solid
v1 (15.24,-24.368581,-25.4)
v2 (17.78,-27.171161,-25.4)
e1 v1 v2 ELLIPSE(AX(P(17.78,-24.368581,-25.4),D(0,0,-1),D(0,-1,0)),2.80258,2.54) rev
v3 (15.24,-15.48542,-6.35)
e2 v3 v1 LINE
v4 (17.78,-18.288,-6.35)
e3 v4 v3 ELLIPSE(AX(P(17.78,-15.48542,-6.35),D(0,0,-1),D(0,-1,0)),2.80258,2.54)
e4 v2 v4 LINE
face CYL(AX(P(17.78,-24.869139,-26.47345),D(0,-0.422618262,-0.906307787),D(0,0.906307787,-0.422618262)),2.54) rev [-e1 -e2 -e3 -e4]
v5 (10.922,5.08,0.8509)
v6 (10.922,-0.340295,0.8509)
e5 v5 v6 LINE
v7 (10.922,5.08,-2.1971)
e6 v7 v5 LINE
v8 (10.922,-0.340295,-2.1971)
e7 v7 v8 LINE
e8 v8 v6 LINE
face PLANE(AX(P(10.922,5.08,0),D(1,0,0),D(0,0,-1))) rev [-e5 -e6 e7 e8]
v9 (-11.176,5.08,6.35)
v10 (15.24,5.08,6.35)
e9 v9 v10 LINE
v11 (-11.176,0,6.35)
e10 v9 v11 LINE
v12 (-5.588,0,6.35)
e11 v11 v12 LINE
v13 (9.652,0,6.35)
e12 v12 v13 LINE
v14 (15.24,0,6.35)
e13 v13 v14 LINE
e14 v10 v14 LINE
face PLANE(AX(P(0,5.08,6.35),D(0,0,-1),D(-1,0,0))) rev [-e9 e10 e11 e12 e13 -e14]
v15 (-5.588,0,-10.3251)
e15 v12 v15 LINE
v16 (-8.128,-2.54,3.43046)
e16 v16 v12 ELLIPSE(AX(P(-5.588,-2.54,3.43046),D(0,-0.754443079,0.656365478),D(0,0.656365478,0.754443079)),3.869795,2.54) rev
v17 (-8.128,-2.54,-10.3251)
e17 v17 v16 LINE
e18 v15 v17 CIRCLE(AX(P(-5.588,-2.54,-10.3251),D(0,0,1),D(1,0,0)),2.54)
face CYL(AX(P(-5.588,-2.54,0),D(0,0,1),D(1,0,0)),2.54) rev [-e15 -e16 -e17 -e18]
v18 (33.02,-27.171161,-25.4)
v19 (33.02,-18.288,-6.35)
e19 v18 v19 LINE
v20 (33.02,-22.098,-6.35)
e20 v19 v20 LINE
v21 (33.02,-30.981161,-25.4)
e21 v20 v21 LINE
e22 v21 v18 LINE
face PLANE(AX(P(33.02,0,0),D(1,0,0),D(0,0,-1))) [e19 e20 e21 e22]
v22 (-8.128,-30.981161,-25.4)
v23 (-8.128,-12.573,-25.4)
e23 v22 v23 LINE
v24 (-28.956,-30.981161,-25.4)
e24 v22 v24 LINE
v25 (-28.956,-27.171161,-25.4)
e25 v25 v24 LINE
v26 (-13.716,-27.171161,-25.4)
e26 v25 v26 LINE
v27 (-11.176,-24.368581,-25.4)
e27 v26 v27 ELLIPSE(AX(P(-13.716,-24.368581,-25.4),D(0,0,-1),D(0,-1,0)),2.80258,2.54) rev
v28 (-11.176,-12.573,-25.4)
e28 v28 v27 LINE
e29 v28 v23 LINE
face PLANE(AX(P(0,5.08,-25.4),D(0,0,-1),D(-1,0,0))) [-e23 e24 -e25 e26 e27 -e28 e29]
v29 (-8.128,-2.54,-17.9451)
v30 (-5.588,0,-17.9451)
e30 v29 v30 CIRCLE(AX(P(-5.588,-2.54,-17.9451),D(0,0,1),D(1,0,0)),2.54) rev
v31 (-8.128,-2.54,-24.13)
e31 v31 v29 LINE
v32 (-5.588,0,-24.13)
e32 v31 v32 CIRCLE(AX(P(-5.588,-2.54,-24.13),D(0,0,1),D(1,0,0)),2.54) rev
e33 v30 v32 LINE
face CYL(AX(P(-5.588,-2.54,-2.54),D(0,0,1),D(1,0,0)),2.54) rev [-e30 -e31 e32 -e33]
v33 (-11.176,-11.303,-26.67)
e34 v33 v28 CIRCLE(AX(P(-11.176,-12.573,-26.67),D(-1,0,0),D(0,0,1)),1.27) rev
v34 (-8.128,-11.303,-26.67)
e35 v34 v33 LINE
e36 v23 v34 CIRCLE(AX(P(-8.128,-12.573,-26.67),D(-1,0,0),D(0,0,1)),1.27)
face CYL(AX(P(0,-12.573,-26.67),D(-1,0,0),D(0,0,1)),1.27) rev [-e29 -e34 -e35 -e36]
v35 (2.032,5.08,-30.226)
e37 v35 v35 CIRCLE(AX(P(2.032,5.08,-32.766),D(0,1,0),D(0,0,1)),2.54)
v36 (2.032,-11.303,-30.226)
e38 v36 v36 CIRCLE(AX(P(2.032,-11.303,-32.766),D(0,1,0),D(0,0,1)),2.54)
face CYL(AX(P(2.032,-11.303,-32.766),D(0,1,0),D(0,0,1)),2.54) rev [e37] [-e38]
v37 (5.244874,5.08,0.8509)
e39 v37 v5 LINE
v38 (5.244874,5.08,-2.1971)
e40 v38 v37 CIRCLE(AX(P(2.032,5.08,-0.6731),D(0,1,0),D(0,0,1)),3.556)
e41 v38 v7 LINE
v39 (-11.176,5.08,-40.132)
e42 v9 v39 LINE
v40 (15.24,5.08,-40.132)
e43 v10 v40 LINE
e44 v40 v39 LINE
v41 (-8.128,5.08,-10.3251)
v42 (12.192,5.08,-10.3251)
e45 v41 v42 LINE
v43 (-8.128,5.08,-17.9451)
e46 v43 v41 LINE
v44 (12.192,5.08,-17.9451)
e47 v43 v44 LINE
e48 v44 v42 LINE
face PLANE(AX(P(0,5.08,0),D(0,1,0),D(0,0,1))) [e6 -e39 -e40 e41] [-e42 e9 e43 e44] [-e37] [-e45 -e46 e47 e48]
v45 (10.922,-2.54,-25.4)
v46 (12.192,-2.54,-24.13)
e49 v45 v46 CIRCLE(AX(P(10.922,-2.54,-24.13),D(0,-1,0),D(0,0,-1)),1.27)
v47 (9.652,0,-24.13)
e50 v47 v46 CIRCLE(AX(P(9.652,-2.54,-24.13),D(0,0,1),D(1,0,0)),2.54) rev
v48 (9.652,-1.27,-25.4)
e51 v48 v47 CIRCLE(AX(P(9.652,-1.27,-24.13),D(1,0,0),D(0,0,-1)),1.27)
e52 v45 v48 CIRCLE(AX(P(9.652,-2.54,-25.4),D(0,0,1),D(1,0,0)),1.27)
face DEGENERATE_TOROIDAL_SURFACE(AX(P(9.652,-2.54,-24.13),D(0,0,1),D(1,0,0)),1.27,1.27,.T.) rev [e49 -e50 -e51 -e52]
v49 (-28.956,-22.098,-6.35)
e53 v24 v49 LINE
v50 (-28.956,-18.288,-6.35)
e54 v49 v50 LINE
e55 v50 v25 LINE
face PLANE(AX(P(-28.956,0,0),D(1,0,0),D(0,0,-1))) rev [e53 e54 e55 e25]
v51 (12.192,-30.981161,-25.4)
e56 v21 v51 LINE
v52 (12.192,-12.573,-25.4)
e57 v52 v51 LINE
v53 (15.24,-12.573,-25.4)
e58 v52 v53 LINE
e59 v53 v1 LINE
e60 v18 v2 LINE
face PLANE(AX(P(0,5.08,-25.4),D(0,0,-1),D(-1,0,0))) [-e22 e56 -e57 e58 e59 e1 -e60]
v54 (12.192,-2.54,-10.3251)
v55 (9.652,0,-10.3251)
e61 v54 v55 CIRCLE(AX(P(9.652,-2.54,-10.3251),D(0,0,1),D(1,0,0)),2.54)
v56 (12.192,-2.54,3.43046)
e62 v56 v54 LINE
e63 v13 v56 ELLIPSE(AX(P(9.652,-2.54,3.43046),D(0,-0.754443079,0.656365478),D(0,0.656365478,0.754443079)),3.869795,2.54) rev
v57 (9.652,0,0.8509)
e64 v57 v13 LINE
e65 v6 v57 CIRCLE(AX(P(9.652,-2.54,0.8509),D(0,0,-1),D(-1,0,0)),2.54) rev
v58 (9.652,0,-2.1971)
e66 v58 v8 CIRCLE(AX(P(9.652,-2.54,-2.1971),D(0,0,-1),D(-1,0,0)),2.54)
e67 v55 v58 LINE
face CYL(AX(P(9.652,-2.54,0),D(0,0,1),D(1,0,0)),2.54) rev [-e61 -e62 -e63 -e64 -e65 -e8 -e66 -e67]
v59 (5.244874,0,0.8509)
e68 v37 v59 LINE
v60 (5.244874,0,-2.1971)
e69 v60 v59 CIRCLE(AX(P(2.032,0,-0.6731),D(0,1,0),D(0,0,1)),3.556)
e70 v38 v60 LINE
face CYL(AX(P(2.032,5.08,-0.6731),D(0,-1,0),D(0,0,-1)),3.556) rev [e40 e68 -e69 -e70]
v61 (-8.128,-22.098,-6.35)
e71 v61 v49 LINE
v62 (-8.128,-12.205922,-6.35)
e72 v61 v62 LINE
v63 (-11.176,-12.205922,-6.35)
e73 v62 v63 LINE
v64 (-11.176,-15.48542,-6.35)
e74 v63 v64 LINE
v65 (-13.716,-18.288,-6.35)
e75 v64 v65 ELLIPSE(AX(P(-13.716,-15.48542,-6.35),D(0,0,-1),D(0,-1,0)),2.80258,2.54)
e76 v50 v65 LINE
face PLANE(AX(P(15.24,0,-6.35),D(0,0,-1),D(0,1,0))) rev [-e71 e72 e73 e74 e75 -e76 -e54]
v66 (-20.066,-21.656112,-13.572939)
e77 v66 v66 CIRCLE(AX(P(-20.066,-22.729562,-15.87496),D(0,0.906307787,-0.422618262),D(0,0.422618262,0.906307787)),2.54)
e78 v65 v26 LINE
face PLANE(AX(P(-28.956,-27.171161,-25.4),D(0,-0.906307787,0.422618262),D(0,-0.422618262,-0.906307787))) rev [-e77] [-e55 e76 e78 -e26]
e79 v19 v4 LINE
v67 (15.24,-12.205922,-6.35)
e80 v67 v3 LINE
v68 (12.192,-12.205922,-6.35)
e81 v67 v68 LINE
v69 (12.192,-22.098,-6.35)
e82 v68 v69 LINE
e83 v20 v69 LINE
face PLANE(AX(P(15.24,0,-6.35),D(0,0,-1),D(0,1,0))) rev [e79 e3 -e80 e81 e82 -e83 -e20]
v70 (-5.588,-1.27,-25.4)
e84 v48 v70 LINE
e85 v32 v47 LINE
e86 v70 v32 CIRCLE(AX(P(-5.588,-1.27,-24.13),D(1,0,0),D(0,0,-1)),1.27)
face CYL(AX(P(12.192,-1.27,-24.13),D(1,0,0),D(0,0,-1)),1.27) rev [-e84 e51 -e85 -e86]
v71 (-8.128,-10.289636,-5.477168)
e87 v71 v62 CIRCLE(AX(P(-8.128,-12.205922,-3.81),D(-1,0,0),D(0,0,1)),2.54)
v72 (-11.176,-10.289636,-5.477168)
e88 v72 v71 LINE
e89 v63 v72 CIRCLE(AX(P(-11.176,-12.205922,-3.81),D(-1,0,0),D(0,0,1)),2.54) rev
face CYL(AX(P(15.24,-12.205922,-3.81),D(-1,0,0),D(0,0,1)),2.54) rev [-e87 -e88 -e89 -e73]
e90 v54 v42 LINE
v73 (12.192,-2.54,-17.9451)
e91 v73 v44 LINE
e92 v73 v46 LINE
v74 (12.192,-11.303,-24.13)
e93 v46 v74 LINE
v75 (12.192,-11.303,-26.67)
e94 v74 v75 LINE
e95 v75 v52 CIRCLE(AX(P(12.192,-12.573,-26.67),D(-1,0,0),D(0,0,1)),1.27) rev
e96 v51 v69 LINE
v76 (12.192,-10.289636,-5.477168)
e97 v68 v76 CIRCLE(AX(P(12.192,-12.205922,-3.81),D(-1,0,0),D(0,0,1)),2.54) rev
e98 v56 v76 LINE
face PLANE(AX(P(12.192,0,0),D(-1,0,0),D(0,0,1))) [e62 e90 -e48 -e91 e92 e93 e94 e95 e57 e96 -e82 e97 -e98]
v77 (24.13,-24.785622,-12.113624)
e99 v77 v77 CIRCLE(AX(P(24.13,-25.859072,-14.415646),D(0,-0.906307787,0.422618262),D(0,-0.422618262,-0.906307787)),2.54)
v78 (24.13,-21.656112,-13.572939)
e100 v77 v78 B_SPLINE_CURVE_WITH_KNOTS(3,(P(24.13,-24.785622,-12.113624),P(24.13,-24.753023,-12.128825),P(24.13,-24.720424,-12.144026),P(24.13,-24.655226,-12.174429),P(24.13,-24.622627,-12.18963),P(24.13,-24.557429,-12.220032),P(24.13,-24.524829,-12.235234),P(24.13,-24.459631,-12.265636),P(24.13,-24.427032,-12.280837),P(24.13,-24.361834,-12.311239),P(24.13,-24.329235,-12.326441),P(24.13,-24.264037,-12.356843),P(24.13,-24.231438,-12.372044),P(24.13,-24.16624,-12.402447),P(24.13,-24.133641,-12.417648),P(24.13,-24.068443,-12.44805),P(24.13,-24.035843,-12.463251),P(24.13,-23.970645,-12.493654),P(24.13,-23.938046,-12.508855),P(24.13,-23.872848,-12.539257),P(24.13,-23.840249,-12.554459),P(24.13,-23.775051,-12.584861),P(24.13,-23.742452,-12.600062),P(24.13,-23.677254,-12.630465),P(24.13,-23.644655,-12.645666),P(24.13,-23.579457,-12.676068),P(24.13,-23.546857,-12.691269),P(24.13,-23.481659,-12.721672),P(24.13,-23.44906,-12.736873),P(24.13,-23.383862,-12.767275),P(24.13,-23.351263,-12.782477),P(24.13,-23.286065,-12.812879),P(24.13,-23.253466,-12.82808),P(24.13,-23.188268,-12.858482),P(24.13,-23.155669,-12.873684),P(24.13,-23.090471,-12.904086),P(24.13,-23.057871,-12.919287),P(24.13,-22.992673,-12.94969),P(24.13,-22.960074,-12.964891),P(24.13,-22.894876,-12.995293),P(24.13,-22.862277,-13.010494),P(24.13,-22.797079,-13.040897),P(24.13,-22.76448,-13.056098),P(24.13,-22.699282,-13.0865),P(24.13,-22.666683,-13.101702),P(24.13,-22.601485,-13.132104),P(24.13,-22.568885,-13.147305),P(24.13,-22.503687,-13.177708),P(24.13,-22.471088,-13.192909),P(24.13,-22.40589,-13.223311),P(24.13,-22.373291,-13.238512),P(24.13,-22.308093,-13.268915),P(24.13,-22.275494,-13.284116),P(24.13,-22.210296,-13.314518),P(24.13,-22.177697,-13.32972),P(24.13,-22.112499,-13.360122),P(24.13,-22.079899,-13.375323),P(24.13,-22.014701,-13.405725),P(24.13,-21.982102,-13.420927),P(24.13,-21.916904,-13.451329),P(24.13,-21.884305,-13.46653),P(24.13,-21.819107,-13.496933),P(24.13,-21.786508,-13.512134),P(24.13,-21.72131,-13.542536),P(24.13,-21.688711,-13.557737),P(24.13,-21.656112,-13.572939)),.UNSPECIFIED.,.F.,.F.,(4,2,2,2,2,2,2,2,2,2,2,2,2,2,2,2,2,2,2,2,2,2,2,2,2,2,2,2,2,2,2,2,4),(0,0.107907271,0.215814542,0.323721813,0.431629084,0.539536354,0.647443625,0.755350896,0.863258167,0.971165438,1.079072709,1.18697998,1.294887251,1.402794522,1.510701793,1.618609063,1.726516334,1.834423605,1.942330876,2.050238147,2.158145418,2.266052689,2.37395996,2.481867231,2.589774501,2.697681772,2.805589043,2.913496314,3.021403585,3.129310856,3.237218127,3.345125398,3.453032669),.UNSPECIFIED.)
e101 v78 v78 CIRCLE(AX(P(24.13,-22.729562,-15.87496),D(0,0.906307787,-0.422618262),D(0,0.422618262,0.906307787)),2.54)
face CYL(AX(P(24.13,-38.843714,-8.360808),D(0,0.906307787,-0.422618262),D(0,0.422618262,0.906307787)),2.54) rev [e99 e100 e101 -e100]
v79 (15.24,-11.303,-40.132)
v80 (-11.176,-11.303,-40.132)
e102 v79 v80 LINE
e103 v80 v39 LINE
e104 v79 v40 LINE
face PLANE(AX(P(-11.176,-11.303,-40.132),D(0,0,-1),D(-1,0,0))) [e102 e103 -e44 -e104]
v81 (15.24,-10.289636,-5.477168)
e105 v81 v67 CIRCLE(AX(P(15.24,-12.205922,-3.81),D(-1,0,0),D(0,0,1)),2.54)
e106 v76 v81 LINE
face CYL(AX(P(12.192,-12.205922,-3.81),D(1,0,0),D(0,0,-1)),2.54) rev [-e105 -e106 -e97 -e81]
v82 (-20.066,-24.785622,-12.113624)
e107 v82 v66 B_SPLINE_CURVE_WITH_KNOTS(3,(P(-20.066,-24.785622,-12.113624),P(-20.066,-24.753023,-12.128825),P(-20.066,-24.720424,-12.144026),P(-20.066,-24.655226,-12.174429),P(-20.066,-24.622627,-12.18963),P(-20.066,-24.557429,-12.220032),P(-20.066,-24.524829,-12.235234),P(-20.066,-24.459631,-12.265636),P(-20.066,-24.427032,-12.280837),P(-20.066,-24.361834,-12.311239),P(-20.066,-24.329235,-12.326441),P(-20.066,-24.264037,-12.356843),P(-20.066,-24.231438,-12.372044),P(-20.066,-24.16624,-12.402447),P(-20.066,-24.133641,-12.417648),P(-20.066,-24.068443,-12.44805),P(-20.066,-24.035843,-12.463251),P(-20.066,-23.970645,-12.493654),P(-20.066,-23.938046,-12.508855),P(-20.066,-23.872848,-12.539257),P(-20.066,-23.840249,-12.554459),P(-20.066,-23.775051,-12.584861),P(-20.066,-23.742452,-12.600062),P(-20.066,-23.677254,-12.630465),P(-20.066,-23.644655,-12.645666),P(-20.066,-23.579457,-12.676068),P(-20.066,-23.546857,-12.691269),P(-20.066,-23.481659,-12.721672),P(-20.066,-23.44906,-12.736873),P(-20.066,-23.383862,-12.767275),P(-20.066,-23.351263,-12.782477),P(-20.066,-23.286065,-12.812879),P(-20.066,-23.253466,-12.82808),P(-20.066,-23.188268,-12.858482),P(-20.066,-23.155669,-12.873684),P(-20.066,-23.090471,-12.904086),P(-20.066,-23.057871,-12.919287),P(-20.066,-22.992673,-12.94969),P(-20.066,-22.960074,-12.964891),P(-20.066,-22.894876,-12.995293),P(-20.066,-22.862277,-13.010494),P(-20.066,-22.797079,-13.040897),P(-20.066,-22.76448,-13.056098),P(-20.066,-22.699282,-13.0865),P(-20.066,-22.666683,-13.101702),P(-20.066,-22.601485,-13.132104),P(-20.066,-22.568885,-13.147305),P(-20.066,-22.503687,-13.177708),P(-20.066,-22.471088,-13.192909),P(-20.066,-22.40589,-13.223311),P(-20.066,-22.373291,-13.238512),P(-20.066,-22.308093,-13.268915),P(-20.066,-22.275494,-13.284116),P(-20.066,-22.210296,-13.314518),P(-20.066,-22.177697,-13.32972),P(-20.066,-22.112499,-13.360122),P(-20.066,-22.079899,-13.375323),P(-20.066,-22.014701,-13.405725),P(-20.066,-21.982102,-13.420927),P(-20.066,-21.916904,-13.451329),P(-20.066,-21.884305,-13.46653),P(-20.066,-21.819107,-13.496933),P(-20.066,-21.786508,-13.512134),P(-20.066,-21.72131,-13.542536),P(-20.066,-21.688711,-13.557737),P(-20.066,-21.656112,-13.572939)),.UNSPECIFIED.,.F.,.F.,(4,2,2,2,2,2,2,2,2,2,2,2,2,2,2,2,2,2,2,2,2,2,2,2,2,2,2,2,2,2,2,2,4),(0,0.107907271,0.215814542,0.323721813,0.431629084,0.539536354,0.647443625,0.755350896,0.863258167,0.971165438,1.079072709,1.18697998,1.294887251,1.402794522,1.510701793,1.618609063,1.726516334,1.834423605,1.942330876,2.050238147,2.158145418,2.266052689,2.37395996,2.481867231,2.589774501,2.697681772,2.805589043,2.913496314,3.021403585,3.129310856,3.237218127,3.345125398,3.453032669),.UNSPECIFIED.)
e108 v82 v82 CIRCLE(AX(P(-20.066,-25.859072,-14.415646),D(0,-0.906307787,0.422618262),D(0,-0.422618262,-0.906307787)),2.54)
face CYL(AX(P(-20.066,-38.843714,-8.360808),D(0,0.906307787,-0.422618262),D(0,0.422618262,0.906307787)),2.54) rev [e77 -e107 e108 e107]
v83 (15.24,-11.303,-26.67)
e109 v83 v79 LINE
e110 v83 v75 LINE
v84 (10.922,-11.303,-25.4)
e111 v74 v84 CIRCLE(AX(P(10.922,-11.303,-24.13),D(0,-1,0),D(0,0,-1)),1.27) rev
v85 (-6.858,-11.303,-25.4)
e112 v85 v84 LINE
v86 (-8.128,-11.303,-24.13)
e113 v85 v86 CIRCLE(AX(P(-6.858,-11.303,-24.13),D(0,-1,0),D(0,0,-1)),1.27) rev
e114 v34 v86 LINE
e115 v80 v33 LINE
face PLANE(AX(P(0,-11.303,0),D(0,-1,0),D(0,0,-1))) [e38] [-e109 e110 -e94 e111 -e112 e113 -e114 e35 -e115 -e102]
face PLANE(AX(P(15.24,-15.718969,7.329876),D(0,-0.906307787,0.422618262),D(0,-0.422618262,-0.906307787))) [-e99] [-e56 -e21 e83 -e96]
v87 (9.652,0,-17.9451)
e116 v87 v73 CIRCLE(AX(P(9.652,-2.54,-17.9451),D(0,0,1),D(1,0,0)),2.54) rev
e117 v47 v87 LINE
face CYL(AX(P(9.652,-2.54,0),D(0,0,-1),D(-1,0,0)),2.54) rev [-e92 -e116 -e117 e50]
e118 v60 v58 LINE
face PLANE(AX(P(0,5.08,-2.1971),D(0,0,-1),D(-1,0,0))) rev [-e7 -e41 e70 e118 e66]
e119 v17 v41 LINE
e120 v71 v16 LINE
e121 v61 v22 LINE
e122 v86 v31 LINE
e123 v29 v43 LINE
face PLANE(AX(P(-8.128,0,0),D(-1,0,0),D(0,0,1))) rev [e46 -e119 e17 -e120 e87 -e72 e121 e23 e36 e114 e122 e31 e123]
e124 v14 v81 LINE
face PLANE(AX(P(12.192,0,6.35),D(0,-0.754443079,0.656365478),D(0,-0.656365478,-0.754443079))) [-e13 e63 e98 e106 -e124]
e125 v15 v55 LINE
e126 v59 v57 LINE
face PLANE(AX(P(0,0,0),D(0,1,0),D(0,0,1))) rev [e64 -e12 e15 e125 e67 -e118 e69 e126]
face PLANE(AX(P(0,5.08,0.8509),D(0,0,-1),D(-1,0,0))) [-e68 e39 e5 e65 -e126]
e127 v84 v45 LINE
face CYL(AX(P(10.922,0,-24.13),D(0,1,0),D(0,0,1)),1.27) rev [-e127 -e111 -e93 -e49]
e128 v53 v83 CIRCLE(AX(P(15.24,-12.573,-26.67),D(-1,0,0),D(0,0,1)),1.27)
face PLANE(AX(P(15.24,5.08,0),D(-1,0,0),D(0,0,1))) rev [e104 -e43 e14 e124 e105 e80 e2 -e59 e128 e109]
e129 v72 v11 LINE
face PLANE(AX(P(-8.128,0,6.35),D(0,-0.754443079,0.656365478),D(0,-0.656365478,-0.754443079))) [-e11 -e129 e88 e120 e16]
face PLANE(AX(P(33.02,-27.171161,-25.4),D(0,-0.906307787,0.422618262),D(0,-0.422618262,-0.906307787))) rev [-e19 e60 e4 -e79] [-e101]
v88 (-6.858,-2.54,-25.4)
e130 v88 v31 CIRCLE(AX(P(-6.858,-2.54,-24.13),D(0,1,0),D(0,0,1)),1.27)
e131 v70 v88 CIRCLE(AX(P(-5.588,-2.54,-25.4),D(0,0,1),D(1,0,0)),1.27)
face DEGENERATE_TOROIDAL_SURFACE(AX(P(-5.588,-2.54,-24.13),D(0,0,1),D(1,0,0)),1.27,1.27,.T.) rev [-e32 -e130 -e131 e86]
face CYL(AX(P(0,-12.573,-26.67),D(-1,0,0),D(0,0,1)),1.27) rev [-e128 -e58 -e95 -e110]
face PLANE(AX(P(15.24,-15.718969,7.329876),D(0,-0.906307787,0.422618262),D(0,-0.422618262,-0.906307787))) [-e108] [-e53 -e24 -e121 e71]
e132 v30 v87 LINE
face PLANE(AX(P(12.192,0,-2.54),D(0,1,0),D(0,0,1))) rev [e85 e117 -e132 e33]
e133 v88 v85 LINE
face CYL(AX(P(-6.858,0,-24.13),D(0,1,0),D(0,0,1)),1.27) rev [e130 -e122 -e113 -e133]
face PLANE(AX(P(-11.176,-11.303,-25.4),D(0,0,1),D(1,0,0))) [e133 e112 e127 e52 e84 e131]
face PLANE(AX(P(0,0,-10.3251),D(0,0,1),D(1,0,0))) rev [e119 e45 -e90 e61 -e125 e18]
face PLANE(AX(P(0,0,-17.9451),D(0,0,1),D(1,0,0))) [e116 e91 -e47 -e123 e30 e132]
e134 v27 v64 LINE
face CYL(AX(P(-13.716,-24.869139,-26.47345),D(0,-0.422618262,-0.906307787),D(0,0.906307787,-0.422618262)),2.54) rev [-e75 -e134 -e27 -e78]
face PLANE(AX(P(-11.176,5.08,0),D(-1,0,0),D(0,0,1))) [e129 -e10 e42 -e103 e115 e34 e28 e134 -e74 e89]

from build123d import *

# Parameters (mm, degrees)
SKETCH1_W           = 26.416
SKETCH1_H           = 31.75
BOSS_EXTRUDE1_DEPTH = 5.08
SKETCH2_W           = 16.51
SKETCH2_H           = 7.62
SKETCH2_W_2         = 3.81
CUT_EXTRUDE1_DEPTH  = 5.08
SKETCH3_W           = 19.05
SKETCH3_H           = 22.098
BOSS_EXTRUDE2_DEPTH = 26.416
BOSS_EXTRUDE3_DEPTH = 3.048
BOSS_EXTRUDE4_DEPTH = 3.048
BOSS_EXTRUDE5_DEPTH = 17.78
BOSS_EXTRUDE6_DEPTH = 17.78
SKETCH10_R          = 2.54
CUT_EXTRUDE3_DEPTH  = 17.78
SKETCH11_W          = 20.32
SKETCH11_H          = 30.981160888
CUT_EXTRUDE4_DEPTH  = 22.86
FILLET3_R           = 2.54
FILLET4_R           = 2.54
SKETCH12_W          = 26.416
SKETCH12_H          = 14.732
SKETCH12_R          = 2.54
BOSS_EXTRUDE7_DEPTH = 16.383
FILLET5_R           = 1.27
FILLET6_R           = 1.27


with BuildPart() as part:
    # Sketch1 → Boss-Extrude1 (new body)
    with BuildSketch(Plane(origin=(0, 0, 0), x_dir=(1, 0, 0), z_dir=(0, 1, 0))):
        with Locations((2.032, 9.525)):
            Rectangle(SKETCH1_W, SKETCH1_H)
        with BuildLine():
            ThreePointArc((5.244874103, -0.8509), (-1.524, 0.6731), (5.244874103, 2.1971))
            Line((5.244874103, 2.1971), (10.922, 2.1971))
            Line((10.922, 2.1971), (10.922, -0.8509))
            Line((10.922, -0.8509), (5.244874103, -0.8509))
        make_face(mode=Mode.SUBTRACT)
    extrude(amount=BOSS_EXTRUDE1_DEPTH)

    # Sketch2 → Cut-Extrude1 (cut)
    with BuildSketch(Plane(origin=(0, 5.08, 0), x_dir=(1, 0, 0), z_dir=(0, 1, 0))):
        with Locations((0.127, 14.1351)):
            Rectangle(SKETCH2_W, SKETCH2_H)
        with Locations((10.287, 14.1351)):
            Rectangle(SKETCH2_W_2, SKETCH2_H)
    extrude(amount=-CUT_EXTRUDE1_DEPTH, mode=Mode.SUBTRACT)

    # Sketch3 → Boss-Extrude2 (add)
    with BuildSketch(Plane.ZY.offset(11.176)):
        with Locations((-15.875, -11.049)):
            Rectangle(SKETCH3_W, SKETCH3_H)
        Polygon((-25.4, -22.098), (-6.35, -22.098), (-25.4, -30.981160888), align=None)
    extrude(amount=-BOSS_EXTRUDE2_DEPTH)

    # Sketch6 → Boss-Extrude3 (add)
    with BuildSketch(Plane.ZY.offset(11.176)):
        Polygon((6.35, 0), (-6.35, -11.049), (-6.35, 0), align=None)
    extrude(amount=-BOSS_EXTRUDE3_DEPTH)

    # Sketch7 → Boss-Extrude4 (add)
    with BuildSketch(Plane(origin=(15.24, 0, 0), x_dir=(0, 0, -1), z_dir=(1, 0, 0))):
        Polygon((-6.35, 0), (6.35, -11.049), (6.35, 0), align=None)
    extrude(amount=-BOSS_EXTRUDE4_DEPTH)

    # Sketch8 → Boss-Extrude5 (add)
    with BuildSketch(Plane(origin=(15.24, 0, 0), x_dir=(0, 0, -1), z_dir=(1, 0, 0))):
        Polygon((6.35, -22.098), (25.4, -30.981160888), (25.4, -27.171160888), (6.35, -18.288), align=None)
    extrude(amount=BOSS_EXTRUDE5_DEPTH)

    # Sketch9 → Boss-Extrude6 (add)
    with BuildSketch(Plane.ZY.offset(11.176)):
        Polygon((-6.35, -22.098), (-25.4, -30.981160888), (-25.4, -27.171160888), (-6.35, -18.288), align=None)
    extrude(amount=BOSS_EXTRUDE6_DEPTH)

    # Sketch10 → Cut-Extrude3 (cut)
    with BuildSketch(Plane(origin=(0, -12.589458796, 5.870561049), x_dir=(1, 0, 0), z_dir=(0, 0.9063077870366494, -0.42261826174070083))):
        with Locations(Location((24.13, 23.993528218, 0), (0, 0, 270))):
            Circle(SKETCH10_R)
        with Locations(Location((-20.066, 23.993528218, 0), (0, 0, 270))):
            Circle(SKETCH10_R)
    extrude(amount=-CUT_EXTRUDE3_DEPTH, mode=Mode.SUBTRACT)

    # Sketch11 → Cut-Extrude4 (cut)
    with BuildSketch(Plane(origin=(0, 0, -25.4), x_dir=(-1, 0, 0), z_dir=(0, 0, -1))):
        with Locations((-2.032, -15.490580444)):
            Rectangle(SKETCH11_W, SKETCH11_H)
    extrude(amount=-CUT_EXTRUDE4_DEPTH, mode=Mode.SUBTRACT)

    # Fillet3
    # the kernel refuses this fillet: 2.54 mm, written as the material it adds along each edge
    with BuildSketch(Plane(origin=(-8.128, 0, -25.4), x_dir=(0, -1, 0), z_dir=(0, 0, 1)), Plane(origin=(12.192, 0, -25.4), x_dir=(-1, 0, 0), z_dir=(0, 0, 1))) as fillet3_piece_1:
        with BuildLine():
            CenterArc((FILLET3_R, FILLET3_R), FILLET3_R, 180, 90)
            Line((0, FILLET3_R), (0, 0))
            Line((0, 0), (FILLET3_R, 0))
        make_face()
    extrude(amount=7.4549)
    with BuildSketch(Plane(origin=(-8.128, 0, -10.3251), x_dir=(1, 0, 0), z_dir=(0, 0, 1))) as fillet3_piece_2_section:
        with BuildLine():
            CenterArc((FILLET3_R, -FILLET3_R), FILLET3_R, 90, 90)
            Line((0, -FILLET3_R), (0, 0))
            Line((0, 0), (FILLET3_R, 0))
        make_face()
    fillet3_piece_2 = extrude(amount=16.6751, mode=Mode.PRIVATE)
    fillet3_piece_2 = split(fillet3_piece_2, bisect_by=Plane(origin=(-7.540337897, -4.52533198, 1.148468989), z_dir=(0, 0.7544430785777146, -0.6563654783626119)), keep=Keep.TOP, mode=Mode.PRIVATE)
    add(fillet3_piece_2)
    with BuildSketch(Plane(origin=(12.192, 0, 6.35), x_dir=(-1, 0, 0), z_dir=(0, 0, -1))) as fillet3_piece_3_section:
        with BuildLine():
            CenterArc((FILLET3_R, -FILLET3_R), FILLET3_R, 90, 90)
            Line((0, -FILLET3_R), (0, 0))
            Line((0, 0), (FILLET3_R, 0))
        make_face()
    fillet3_piece_3 = extrude(amount=16.6751, mode=Mode.PRIVATE)
    fillet3_piece_3 = split(fillet3_piece_3, bisect_by=Plane(origin=(10.504295152, -0.059519406, 0.8509), z_dir=(0, 0, 1)), keep=Keep.TOP, mode=Mode.PRIVATE)
    fillet3_piece_3 = split(fillet3_piece_3, bisect_by=Plane(origin=(10.922, -0.059519406, 3.561570264), z_dir=(-1, 0, 0)), keep=Keep.TOP, mode=Mode.PRIVATE)
    fillet3_piece_3 = split(fillet3_piece_3, bisect_by=Plane(origin=(10.504295152, -1.406445505, 4.733395971), z_dir=(0, 0.7544430785777146, -0.6563654783626119)), keep=Keep.TOP, mode=Mode.PRIVATE)
    add(fillet3_piece_3)
    with BuildSketch(Plane(origin=(12.192, 0, 6.35), x_dir=(-1, 0, 0), z_dir=(0, 0, -1))) as fillet3_piece_4_section:
        with BuildLine():
            CenterArc((FILLET3_R, -FILLET3_R), FILLET3_R, 90, 90)
            Line((0, -FILLET3_R), (0, 0))
            Line((0, 0), (FILLET3_R, 0))
        make_face()
    fillet3_piece_4 = extrude(amount=16.6751, mode=Mode.PRIVATE)
    fillet3_piece_4 = split(fillet3_piece_4, bisect_by=Plane(origin=(11.748492429, -0.576014265, 0.8509), z_dir=(0, 0, 1)), keep=Keep.TOP, mode=Mode.PRIVATE)
    fillet3_piece_4 = split(fillet3_piece_4, bisect_by=Plane(origin=(10.922, -0.576014265, 3.268620732), z_dir=(1, 0, 0)), keep=Keep.TOP, mode=Mode.PRIVATE)
    fillet3_piece_4 = split(fillet3_piece_4, bisect_by=Plane(origin=(11.748492429, -1.774025363, 4.310890388), z_dir=(0, 0.7544430785777146, -0.6563654783626119)), keep=Keep.TOP, mode=Mode.PRIVATE)
    add(fillet3_piece_4)
    with BuildSketch(Plane(origin=(12.192, 0, 6.35), x_dir=(-1, 0, 0), z_dir=(0, 0, -1))) as fillet3_piece_5_section:
        with BuildLine():
            CenterArc((FILLET3_R, -FILLET3_R), FILLET3_R, 90, 90)
            Line((0, -FILLET3_R), (0, 0))
            Line((0, 0), (FILLET3_R, 0))
        make_face()
    fillet3_piece_5 = extrude(amount=16.6751, mode=Mode.PRIVATE)
    fillet3_piece_5 = split(fillet3_piece_5, bisect_by=Plane(origin=(11.774444919, -0.648004952, 0.8509), z_dir=(0, 0, -1)), keep=Keep.TOP, mode=Mode.PRIVATE)
    fillet3_piece_5 = split(fillet3_piece_5, bisect_by=Plane(origin=(10.922, -0.648004952, -0.6731), z_dir=(1, 0, 0)), keep=Keep.TOP, mode=Mode.PRIVATE)
    fillet3_piece_5 = split(fillet3_piece_5, bisect_by=Plane(origin=(11.774444919, -0.648004952, -2.1971), z_dir=(0, 0, 1)), keep=Keep.TOP, mode=Mode.PRIVATE)
    add(fillet3_piece_5)
    with BuildSketch(Plane(origin=(12.192, 0, 6.35), x_dir=(-1, 0, 0), z_dir=(0, 0, -1))) as fillet3_piece_6_section:
        with BuildLine():
            CenterArc((FILLET3_R, -FILLET3_R), FILLET3_R, 90, 90)
            Line((0, -FILLET3_R), (0, 0))
            Line((0, 0), (FILLET3_R, 0))
        make_face()
    fillet3_piece_6 = extrude(amount=16.6751, mode=Mode.PRIVATE)
    fillet3_piece_6 = split(fillet3_piece_6, bisect_by=Plane(origin=(10.922, -0.060981289, -6.2611), z_dir=(-1, 0, 0)), keep=Keep.TOP, mode=Mode.PRIVATE)
    fillet3_piece_6 = split(fillet3_piece_6, bisect_by=Plane(origin=(10.507343007, -0.060981289, -2.1971), z_dir=(0, 0, -1)), keep=Keep.TOP, mode=Mode.PRIVATE)
    add(fillet3_piece_6)
    with BuildSketch(Plane(origin=(12.192, 0, 6.35), x_dir=(-1, 0, 0), z_dir=(0, 0, -1))) as fillet3_piece_7_section:
        with BuildLine():
            CenterArc((FILLET3_R, -FILLET3_R), FILLET3_R, 90, 90)
            Line((0, -FILLET3_R), (0, 0))
            Line((0, 0), (FILLET3_R, 0))
        make_face()
    fillet3_piece_7 = extrude(amount=16.6751, mode=Mode.PRIVATE)
    fillet3_piece_7 = split(fillet3_piece_7, bisect_by=Plane(origin=(10.922, -0.648004952, -6.2611), z_dir=(1, 0, 0)), keep=Keep.TOP, mode=Mode.PRIVATE)
    fillet3_piece_7 = split(fillet3_piece_7, bisect_by=Plane(origin=(11.774444919, -0.648004952, -2.1971), z_dir=(0, 0, -1)), keep=Keep.TOP, mode=Mode.PRIVATE)
    add(fillet3_piece_7)
    with BuildSketch(Plane(origin=(15.24, -29.85478685, -31.155054448), x_dir=(1, 0, 0), z_dir=(0, 0.42261826174070066, 0.9063077870366494))) as fillet3_piece_8_section:
        with BuildLine():
            CenterArc((FILLET3_R, FILLET3_R), FILLET3_R, 180, 90)
            Line((0, FILLET3_R), (0, 0))
            Line((0, 0), (FILLET3_R, 0))
        make_face()
    fillet3_piece_8 = extrude(amount=33.719349356, mode=Mode.PRIVATE)
    fillet3_piece_8 = split(fillet3_piece_8, bisect_by=Plane(origin=(15.81504359, -22.095090044, -25.4), z_dir=(0, 0, 1)), keep=Keep.TOP, mode=Mode.PRIVATE)
    fillet3_piece_8 = split(fillet3_piece_8, bisect_by=Plane(origin=(15.81504359, -22.095090044, -6.35), z_dir=(0, 0, -1)), keep=Keep.TOP, mode=Mode.PRIVATE)
    add(fillet3_piece_8)
    with BuildSketch(Plane(origin=(-11.176, -29.85478685, -31.155054448), x_dir=(0, 0.9063077870366492, -0.4226182617407009), z_dir=(0, 0.4226182617407009, 0.9063077870366493))) as fillet3_piece_9_section:
        with BuildLine():
            CenterArc((FILLET3_R, FILLET3_R), FILLET3_R, 180, 90)
            Line((0, FILLET3_R), (0, 0))
            Line((0, 0), (FILLET3_R, 0))
        make_face()
    fillet3_piece_9 = extrude(amount=33.719349356, mode=Mode.PRIVATE)
    fillet3_piece_9 = split(fillet3_piece_9, bisect_by=Plane(origin=(-11.75104359, -22.095090044, -25.4), z_dir=(0, 0, 1)), keep=Keep.TOP, mode=Mode.PRIVATE)
    fillet3_piece_9 = split(fillet3_piece_9, bisect_by=Plane(origin=(-11.75104359, -22.095090044, -6.35), z_dir=(0, 0, -1)), keep=Keep.TOP, mode=Mode.PRIVATE)
    add(fillet3_piece_9)

    # Fillet4
    fillet4_edges = [part.edges().sort_by_distance(p)[0] for p in [
        (-9.652, -11.049, -6.35),
        (13.716, -11.049, -6.35),
    ]]
    fillet(fillet4_edges, radius=FILLET4_R)

    # Sketch12 → Boss-Extrude7 (add)
    with BuildSketch(Plane(origin=(0, 5.08, 0), x_dir=(1, 0, 0), z_dir=(0, 1, 0))):
        with Locations((2.032, 32.766)):
            Rectangle(SKETCH12_W, SKETCH12_H)
        with Locations(Location((2.032, 32.766, 0), (0, 0, 270))):
            Circle(SKETCH12_R, mode=Mode.SUBTRACT)
    extrude(amount=-BOSS_EXTRUDE7_DEPTH)

    # Fillet5
    fillet5_edges = [part.edges().sort_by_distance(p)[0] for p in [
        (12.192, -6.9215, -25.4),
        (2.032, 0, -25.4),
        (-7.384051224, -0.743948776, -25.4),
        (11.448051224, -0.743948776, -25.4),
        (-8.128, -6.9215, -25.4),
    ]]
    fillet(fillet5_edges, radius=FILLET5_R)

    # Fillet6
    fillet6_edges = [part.edges().sort_by_distance(p)[0] for p in [
        (13.716, -11.303, -25.4),
        (-9.652, -11.303, -25.4),
    ]]
    fillet(fillet6_edges, radius=FILLET6_R)


solid = part.part
